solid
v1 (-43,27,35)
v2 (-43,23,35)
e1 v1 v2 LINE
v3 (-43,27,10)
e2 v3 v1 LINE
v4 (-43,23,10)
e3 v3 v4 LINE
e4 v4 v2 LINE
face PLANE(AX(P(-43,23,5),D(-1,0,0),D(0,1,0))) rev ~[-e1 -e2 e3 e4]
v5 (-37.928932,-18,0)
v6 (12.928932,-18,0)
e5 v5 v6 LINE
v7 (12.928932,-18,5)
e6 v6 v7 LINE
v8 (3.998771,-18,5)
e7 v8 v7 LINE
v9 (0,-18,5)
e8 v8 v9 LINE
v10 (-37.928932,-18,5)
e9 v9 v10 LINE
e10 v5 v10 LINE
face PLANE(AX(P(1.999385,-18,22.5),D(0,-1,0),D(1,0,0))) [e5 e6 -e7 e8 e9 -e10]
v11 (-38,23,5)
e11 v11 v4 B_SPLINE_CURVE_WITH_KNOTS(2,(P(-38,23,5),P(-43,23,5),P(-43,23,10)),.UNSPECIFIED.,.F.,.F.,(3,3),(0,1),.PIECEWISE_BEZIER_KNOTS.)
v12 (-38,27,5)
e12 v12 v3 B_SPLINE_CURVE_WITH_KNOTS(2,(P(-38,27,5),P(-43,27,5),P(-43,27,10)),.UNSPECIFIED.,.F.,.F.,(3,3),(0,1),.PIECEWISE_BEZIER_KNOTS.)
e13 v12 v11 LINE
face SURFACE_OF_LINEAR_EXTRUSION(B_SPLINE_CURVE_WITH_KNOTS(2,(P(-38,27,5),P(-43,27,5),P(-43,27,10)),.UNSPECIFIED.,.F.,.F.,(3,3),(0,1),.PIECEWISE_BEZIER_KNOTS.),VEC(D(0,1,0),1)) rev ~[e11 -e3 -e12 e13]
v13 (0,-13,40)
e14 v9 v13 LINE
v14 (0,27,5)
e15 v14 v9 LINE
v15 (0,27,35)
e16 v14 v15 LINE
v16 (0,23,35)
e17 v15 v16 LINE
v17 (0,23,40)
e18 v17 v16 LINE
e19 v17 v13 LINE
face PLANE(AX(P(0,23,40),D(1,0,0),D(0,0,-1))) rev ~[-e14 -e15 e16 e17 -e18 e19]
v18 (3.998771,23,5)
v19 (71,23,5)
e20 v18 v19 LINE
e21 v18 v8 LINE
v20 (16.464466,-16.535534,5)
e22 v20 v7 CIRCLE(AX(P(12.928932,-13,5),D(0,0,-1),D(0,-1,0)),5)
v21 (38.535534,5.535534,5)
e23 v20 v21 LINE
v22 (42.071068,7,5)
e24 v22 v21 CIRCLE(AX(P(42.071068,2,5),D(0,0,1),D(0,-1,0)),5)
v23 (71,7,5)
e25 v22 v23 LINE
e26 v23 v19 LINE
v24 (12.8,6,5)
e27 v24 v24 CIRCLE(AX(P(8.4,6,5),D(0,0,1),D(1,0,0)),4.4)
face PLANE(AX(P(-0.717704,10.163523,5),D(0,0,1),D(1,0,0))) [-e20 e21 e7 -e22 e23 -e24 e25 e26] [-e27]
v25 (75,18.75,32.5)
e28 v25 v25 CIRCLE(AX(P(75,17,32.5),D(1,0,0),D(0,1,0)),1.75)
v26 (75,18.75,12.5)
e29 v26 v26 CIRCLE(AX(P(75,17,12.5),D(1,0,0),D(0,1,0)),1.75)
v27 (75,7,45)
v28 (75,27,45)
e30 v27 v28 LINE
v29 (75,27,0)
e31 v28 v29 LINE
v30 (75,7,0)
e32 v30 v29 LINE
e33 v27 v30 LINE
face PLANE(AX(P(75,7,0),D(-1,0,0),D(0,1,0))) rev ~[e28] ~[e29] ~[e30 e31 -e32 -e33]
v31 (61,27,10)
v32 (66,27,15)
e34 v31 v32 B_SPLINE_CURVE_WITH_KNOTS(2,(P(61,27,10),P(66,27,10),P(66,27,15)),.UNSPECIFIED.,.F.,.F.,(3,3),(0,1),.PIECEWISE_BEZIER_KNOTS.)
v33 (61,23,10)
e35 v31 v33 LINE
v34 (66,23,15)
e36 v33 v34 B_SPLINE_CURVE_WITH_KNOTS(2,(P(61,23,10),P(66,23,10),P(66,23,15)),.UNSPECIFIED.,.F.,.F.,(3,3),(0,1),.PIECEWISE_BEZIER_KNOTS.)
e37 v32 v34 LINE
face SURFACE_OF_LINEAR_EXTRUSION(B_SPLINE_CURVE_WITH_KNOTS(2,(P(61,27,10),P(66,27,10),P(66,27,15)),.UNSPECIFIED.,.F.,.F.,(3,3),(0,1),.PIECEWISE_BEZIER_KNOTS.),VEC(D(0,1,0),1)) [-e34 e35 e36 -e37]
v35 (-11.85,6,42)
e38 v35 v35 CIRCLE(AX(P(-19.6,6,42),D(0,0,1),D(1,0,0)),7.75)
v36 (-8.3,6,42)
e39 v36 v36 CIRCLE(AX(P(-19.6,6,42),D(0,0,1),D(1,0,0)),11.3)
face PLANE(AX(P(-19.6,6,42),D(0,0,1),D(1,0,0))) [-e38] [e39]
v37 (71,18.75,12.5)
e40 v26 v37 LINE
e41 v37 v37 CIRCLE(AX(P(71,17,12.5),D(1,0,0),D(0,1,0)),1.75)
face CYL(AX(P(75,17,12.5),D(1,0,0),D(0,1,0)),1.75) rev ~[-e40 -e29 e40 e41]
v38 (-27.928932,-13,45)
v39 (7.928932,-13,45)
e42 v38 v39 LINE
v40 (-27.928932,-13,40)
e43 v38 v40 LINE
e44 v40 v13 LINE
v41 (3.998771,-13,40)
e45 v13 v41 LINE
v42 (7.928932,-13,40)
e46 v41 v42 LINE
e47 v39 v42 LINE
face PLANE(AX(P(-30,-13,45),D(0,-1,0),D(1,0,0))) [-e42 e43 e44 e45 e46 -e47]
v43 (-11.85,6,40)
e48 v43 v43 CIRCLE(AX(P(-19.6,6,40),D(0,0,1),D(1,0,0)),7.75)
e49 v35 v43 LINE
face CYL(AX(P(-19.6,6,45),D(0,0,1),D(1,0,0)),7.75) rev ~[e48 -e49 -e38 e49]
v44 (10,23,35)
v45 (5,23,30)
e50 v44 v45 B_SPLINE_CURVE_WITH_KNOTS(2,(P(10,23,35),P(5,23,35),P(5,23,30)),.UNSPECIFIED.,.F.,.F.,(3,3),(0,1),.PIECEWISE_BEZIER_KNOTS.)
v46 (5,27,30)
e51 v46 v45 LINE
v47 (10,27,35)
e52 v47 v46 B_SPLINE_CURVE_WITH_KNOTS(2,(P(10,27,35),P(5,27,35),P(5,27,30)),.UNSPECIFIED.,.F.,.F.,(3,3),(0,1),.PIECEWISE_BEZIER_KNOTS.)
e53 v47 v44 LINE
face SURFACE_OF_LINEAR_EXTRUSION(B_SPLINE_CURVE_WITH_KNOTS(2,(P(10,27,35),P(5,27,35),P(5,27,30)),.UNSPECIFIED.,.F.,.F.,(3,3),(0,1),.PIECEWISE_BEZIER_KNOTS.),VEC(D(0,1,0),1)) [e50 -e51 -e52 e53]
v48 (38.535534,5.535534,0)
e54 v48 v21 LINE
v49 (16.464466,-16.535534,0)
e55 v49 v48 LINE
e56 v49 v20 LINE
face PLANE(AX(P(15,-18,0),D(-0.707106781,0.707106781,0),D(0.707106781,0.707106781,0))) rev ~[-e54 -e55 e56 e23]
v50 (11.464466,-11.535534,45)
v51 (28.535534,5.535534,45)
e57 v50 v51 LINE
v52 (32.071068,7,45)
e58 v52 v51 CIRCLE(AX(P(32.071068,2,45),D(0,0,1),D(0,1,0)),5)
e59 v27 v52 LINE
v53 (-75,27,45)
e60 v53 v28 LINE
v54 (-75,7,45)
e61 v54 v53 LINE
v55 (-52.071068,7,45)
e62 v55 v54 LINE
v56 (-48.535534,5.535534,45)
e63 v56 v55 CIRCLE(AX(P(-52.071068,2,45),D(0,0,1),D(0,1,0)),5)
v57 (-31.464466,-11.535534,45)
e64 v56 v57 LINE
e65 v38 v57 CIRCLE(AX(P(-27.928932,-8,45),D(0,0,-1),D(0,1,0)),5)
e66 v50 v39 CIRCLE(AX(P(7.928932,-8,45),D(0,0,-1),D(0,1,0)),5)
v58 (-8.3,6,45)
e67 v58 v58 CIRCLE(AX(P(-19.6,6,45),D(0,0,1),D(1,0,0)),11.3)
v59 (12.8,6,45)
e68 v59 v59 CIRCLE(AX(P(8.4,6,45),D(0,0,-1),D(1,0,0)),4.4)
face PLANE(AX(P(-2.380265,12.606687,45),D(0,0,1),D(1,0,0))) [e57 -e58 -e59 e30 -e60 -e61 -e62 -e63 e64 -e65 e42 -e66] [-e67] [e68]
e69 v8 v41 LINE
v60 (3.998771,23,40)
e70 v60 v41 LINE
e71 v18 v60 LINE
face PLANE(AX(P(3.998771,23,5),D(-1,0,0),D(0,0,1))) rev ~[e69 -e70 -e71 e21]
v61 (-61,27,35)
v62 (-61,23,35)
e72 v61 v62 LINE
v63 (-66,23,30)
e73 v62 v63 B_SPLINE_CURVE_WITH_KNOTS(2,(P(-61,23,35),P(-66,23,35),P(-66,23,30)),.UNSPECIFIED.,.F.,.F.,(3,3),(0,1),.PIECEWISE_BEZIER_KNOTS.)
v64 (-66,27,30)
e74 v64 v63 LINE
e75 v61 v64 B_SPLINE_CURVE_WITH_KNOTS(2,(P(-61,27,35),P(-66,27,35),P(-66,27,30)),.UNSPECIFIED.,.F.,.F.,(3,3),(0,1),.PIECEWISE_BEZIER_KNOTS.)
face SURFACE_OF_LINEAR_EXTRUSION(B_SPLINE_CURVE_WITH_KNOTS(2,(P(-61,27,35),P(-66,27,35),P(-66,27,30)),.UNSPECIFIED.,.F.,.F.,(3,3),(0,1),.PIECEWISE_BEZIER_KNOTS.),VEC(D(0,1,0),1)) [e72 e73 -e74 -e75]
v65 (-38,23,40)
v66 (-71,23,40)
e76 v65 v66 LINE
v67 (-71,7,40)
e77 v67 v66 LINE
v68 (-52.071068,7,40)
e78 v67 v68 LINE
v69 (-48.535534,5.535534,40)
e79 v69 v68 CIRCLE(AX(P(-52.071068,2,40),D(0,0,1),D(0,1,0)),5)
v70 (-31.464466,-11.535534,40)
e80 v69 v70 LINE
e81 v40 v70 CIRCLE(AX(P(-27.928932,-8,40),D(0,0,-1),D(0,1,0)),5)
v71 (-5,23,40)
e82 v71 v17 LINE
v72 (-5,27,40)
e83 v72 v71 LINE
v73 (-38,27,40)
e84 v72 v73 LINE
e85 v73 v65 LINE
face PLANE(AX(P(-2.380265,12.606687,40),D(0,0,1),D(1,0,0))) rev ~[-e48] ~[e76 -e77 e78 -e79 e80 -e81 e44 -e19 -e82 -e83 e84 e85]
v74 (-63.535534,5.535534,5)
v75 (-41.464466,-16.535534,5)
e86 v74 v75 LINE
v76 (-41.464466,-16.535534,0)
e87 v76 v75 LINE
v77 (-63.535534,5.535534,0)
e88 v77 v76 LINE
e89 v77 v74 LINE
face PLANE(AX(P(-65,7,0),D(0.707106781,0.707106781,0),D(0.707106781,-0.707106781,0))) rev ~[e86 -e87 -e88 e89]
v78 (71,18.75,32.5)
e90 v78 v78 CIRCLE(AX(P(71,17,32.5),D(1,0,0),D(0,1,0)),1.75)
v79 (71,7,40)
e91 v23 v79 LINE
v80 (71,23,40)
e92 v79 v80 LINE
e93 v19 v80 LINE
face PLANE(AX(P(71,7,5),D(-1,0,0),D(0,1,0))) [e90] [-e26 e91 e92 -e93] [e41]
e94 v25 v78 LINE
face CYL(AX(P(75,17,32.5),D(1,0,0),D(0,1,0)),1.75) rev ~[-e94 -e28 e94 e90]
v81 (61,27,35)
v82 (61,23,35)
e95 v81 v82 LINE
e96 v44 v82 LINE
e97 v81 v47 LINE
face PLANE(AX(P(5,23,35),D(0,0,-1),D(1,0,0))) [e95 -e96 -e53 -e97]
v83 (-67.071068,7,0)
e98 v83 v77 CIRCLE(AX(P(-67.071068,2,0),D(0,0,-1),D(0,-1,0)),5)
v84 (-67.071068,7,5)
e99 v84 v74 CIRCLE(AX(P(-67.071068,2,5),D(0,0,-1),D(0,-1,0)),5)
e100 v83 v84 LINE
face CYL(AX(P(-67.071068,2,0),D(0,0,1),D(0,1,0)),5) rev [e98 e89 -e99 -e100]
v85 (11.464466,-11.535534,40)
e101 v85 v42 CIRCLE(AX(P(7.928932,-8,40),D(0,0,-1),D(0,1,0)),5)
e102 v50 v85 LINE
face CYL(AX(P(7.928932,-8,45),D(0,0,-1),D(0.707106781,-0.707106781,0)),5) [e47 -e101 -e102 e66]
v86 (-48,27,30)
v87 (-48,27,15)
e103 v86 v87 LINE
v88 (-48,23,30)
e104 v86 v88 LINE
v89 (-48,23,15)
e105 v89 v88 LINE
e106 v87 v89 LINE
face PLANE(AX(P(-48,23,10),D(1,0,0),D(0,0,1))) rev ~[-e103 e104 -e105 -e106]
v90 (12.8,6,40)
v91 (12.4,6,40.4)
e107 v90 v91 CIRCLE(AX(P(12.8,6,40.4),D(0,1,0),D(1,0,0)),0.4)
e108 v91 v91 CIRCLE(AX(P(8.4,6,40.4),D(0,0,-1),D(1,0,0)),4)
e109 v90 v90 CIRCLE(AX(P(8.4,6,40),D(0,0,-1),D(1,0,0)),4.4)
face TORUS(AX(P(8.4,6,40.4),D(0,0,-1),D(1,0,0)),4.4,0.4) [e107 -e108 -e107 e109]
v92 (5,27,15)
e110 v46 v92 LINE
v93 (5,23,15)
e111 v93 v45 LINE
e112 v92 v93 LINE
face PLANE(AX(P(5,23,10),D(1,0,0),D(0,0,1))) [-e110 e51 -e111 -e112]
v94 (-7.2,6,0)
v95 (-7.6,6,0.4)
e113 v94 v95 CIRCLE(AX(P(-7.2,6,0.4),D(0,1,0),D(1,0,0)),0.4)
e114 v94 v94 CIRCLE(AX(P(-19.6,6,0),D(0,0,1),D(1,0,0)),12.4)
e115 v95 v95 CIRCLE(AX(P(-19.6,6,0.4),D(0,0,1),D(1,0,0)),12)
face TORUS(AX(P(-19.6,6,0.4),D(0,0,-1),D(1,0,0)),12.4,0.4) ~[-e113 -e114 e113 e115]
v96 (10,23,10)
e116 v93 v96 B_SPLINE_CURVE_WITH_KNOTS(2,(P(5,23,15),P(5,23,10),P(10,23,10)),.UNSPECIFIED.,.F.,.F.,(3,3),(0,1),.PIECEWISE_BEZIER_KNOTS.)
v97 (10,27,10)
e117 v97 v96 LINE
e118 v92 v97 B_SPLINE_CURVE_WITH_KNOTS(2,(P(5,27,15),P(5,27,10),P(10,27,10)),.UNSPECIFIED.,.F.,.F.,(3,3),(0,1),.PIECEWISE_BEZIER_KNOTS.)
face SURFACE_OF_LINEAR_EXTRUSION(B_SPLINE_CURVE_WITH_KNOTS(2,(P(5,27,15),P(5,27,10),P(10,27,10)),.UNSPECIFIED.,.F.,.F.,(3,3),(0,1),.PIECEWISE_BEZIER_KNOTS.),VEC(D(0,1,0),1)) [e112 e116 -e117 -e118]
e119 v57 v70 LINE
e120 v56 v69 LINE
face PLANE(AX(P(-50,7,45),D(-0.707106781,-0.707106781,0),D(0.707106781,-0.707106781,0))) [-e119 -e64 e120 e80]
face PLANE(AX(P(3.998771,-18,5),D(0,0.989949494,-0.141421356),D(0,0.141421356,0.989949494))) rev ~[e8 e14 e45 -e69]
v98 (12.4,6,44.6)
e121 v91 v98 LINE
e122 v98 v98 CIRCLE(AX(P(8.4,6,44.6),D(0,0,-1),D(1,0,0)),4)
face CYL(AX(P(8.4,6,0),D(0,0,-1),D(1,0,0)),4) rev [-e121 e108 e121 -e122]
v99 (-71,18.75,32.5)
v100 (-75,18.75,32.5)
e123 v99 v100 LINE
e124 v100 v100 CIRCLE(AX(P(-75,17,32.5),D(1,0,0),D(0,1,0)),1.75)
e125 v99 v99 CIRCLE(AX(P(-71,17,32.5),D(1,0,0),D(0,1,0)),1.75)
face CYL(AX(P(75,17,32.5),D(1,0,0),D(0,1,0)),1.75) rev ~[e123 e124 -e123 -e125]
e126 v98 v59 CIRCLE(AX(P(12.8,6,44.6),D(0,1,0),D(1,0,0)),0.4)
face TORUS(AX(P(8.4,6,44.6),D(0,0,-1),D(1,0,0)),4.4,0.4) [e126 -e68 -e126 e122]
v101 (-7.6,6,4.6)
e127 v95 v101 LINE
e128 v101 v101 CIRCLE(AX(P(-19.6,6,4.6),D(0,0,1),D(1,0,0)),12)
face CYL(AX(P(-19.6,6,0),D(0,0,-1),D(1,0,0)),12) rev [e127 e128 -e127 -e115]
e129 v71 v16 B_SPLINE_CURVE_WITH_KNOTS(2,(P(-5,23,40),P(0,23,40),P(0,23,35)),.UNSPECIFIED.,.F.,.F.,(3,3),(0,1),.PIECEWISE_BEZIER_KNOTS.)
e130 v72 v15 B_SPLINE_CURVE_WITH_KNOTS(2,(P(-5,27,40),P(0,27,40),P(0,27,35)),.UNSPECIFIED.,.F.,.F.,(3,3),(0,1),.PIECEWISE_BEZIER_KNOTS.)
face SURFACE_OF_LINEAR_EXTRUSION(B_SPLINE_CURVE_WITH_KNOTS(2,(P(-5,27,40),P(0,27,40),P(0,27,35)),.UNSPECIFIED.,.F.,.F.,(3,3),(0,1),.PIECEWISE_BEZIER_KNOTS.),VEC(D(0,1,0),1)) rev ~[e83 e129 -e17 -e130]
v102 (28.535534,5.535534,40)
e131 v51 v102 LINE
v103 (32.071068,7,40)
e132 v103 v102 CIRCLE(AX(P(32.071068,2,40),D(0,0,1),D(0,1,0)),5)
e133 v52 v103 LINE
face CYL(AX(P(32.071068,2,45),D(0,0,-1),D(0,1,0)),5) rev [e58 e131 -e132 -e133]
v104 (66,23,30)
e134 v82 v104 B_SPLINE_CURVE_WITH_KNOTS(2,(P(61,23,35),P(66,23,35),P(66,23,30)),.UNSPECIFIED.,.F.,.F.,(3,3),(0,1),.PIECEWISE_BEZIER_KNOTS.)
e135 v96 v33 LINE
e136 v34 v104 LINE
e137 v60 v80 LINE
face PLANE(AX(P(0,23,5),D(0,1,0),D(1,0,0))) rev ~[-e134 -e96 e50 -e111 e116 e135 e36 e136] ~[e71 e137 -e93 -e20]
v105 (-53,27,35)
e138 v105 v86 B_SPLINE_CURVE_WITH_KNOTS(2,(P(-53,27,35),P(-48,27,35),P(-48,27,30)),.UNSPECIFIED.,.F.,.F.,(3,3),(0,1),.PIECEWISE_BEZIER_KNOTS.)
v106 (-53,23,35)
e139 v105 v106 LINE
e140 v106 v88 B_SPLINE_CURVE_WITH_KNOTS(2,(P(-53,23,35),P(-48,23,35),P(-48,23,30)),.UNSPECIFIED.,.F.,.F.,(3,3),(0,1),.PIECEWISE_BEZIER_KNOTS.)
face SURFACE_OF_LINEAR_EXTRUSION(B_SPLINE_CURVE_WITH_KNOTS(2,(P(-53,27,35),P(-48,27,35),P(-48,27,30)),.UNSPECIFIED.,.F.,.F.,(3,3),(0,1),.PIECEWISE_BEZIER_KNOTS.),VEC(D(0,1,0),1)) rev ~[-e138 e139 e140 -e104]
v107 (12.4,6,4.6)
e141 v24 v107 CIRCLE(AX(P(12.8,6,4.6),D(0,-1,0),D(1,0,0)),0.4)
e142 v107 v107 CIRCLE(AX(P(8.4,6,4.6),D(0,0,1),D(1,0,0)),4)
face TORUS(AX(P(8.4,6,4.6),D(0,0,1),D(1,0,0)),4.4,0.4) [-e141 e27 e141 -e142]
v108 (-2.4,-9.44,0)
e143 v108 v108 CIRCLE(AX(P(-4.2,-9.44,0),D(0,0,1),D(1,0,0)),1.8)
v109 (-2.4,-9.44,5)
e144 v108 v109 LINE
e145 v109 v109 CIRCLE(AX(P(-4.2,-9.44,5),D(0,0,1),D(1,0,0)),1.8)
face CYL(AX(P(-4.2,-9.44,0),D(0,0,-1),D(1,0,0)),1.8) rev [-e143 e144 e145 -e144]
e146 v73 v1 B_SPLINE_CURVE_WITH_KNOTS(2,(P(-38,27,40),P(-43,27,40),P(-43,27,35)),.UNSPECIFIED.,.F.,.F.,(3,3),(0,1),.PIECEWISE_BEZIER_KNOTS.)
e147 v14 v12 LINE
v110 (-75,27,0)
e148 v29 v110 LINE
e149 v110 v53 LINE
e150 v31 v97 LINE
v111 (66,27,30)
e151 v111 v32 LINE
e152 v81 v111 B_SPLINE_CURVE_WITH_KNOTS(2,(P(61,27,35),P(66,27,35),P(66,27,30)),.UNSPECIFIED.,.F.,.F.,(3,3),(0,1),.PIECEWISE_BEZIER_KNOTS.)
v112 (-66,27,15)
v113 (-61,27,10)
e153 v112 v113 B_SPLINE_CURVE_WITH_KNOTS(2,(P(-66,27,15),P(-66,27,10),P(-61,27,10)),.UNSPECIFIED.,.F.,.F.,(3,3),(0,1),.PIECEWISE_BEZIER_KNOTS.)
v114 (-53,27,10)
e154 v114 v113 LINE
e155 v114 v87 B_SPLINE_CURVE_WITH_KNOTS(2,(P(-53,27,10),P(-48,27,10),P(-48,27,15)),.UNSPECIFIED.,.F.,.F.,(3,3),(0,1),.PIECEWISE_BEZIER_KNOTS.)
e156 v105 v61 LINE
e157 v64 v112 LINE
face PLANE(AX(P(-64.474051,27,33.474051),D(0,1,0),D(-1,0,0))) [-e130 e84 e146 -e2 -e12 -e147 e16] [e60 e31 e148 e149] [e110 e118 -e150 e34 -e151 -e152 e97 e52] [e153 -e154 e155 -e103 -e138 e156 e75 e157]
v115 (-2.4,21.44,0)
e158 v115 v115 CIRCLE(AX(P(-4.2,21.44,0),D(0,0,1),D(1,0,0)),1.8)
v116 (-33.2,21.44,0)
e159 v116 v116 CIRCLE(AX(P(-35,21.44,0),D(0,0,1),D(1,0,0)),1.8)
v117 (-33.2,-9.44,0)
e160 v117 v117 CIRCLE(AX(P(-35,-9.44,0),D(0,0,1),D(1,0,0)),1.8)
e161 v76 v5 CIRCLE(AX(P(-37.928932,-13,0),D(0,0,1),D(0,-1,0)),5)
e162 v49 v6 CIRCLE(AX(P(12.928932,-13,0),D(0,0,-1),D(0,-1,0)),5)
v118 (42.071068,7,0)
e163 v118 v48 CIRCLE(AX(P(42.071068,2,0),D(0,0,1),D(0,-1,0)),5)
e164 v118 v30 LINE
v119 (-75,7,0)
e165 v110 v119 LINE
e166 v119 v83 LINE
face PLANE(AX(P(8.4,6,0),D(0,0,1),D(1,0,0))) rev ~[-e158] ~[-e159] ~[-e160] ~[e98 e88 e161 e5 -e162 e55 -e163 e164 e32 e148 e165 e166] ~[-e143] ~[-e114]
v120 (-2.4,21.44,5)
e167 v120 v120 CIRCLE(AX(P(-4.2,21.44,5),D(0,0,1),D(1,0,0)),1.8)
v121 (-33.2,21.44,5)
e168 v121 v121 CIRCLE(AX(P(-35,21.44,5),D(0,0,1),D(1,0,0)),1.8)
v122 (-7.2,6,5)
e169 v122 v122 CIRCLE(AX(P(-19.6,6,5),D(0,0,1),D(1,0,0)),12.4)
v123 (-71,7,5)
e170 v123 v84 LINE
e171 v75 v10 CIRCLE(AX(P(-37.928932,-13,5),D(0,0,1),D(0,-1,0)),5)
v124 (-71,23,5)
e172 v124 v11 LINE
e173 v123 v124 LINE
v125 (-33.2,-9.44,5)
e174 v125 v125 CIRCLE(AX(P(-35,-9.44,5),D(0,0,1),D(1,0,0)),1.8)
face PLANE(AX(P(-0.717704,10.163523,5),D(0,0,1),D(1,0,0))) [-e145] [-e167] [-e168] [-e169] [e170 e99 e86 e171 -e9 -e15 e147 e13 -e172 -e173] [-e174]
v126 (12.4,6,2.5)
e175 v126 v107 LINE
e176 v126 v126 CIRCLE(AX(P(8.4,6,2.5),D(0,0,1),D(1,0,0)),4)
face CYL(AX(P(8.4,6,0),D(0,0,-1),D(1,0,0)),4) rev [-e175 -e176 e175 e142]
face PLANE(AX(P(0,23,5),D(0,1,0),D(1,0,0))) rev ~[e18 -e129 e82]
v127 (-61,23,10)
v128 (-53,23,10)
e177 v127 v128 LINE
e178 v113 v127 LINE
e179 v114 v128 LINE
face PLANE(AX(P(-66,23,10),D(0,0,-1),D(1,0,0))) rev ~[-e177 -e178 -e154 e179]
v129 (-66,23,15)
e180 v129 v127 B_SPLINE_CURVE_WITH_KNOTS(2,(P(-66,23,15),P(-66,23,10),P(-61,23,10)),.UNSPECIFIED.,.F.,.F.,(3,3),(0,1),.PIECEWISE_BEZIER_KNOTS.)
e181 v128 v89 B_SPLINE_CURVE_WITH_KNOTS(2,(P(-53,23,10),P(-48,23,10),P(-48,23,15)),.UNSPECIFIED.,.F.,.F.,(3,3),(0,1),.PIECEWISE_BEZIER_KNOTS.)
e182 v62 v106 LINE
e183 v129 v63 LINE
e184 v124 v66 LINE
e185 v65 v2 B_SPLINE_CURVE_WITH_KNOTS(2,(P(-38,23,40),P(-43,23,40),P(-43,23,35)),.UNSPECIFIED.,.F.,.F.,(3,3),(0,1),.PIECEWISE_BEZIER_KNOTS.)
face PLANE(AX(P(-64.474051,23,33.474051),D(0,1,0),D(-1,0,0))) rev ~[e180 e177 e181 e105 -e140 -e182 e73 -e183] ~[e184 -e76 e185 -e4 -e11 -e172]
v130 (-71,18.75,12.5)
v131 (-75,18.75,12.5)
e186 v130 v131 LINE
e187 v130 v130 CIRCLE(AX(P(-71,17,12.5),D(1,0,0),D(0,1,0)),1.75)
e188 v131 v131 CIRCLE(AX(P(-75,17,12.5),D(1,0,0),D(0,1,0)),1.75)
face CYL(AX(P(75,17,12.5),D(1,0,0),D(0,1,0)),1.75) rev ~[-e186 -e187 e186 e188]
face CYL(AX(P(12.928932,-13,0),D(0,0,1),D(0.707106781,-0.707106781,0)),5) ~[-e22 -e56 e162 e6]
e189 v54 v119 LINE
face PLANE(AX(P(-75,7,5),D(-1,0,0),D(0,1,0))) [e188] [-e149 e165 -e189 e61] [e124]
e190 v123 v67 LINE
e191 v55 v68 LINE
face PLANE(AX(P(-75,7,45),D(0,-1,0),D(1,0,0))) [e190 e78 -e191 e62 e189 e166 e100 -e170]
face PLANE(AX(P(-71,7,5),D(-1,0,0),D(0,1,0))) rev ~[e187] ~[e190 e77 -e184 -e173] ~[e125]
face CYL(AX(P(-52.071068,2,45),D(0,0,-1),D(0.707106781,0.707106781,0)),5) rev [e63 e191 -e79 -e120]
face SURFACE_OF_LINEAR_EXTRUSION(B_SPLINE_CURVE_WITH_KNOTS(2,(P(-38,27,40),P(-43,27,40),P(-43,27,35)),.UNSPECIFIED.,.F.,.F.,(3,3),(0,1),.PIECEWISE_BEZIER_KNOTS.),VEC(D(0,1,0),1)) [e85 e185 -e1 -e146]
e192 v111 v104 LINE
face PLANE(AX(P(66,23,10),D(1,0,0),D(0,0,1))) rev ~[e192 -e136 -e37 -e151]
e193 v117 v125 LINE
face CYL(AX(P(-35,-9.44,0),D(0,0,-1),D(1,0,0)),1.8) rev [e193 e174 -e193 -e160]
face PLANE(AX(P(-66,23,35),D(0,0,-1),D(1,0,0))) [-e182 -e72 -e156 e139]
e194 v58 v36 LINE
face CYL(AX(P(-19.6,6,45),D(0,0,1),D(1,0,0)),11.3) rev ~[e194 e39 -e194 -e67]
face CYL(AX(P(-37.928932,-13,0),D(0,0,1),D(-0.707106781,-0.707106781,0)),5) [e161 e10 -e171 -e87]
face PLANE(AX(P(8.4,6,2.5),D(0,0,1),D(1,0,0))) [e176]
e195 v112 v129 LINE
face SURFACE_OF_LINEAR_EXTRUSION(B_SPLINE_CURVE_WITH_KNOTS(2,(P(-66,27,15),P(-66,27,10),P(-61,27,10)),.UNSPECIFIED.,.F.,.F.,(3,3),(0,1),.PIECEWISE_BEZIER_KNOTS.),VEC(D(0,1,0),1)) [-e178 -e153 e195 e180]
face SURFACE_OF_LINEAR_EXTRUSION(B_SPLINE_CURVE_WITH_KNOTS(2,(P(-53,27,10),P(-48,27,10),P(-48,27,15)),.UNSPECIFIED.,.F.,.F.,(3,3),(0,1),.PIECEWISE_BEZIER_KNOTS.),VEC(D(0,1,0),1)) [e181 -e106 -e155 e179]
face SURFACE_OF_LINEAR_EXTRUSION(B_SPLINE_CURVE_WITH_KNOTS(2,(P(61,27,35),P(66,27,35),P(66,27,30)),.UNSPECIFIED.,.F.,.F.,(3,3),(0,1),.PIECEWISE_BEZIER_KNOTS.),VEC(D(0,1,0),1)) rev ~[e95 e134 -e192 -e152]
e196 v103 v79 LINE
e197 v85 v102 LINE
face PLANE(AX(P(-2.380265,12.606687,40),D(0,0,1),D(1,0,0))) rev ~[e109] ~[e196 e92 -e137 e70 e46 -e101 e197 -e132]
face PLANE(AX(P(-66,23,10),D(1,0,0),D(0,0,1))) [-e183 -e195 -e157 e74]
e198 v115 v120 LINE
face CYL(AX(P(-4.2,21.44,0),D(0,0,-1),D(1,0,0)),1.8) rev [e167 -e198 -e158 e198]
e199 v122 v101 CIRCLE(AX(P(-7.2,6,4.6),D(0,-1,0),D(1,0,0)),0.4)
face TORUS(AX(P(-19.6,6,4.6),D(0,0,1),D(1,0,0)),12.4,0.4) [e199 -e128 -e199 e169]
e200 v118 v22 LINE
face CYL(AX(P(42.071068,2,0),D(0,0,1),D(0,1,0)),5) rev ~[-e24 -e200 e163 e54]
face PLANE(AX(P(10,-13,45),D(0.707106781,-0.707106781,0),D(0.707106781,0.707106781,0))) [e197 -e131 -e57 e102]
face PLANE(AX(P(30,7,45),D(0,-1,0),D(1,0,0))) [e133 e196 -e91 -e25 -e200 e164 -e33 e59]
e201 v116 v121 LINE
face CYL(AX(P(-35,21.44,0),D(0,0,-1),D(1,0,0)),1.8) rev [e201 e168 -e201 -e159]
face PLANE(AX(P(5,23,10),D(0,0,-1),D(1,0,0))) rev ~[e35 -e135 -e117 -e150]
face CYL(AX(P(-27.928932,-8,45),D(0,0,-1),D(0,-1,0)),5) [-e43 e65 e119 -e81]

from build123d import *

# Parameters (mm, degrees)
F0_R         = 1.8
F0_R_2       = 12
F0_R_3       = 4
F1_DEPTH     = 5
F2_W         = 4
F2_H         = 20
F3_DEPTH     = 40
F4_R         = 12.5
F4_R_2       = 11.3
F4_R_3       = 7.75
F5_DEPTH     = 5
F6_DEPTH     = 50
F7_DEPTH     = 3
F8_R         = 5
F9_R         = 0.4
F10_DEPTH    = 2.5
F11_R        = 1.75
F12_DEPTH    = 150.001
F13_W        = 28
F13_H        = 4
F13_W_2      = 71
F14_DEPTH    = 40
F15_W        = 18
F15_H        = 25
F15_W_2      = 61
F16_DEPTH    = 25
F17_T1_DEPTH = 4
F19_DEPTH    = 41
F21_DEPTH    = 5


# Not quite as in the source:
# - a fillet or chamfer that OpenCascade refuses, or shapes differently, is made with other operations: its cross-section is extruded or revolved along the edge and cut away or added


with BuildPart() as f1:
    # F0 (on Top) → F1 (new body)
    with BuildSketch(Plane.XY):
        Polygon((75, 27), (-75, 27), (-75, 7), (-65, 7), (-40, -18), (15, -18), (40, 7), (75, 7), align=None)
        with Locations((-35, -9.44)):
            Circle(F0_R, mode=Mode.SUBTRACT)
        with Locations((-4.2, -9.44)):
            Circle(F0_R, mode=Mode.SUBTRACT)
        with Locations((-19.6, 6)):
            Circle(F0_R_2, mode=Mode.SUBTRACT)
        with Locations((-35, 21.44)):
            Circle(F0_R, mode=Mode.SUBTRACT)
        with Locations((-4.2, 21.44)):
            Circle(F0_R, mode=Mode.SUBTRACT)
        with Locations((8.4, 6)):
            Circle(F0_R_3, mode=Mode.SUBTRACT)
    extrude(amount=F1_DEPTH)

    # F2 (on face) → F3 (join)
    with BuildSketch(Plane.XY.offset(5)):
        with Locations((-73, 17)):
            Rectangle(F2_W, F2_H)
        with Locations((73, 17)):
            Rectangle(F2_W, F2_H)
    extrude(amount=F3_DEPTH)

    # F4 (on face) → F5 (join)
    with BuildSketch(Plane.XY.offset(45)):
        Polygon((71, 7), (71, 27), (-75, 27), (-75, 7), (-50, 7), (-30, -13), (10, -13), (30, 7), align=None)
        with Locations((-19.6, 6)):
            Circle(F4_R, mode=Mode.SUBTRACT)
        with Locations((-19.6, 6)):
            Circle(F4_R)
        with Locations((-19.6, 6)):
            Circle(F4_R_2, mode=Mode.SUBTRACT)
        with Locations((-19.6, 6)):
            Circle(F4_R_2)
        with Locations((-19.6, 6)):
            Circle(F4_R_3, mode=Mode.SUBTRACT)
    extrude(amount=-F5_DEPTH)

    # F0 (on Top) → F6 (cut)
    with BuildSketch(Plane.XY):
        with Locations((8.4, 6)):
            Circle(F0_R_3)
    extrude(amount=F6_DEPTH, mode=Mode.SUBTRACT)

    # F4 (on face) → F7 (cut)
    with BuildSketch(Plane.XY.offset(45)):
        with Locations((-19.6, 6)):
            Circle(F4_R_2)
        with Locations((-19.6, 6)):
            Circle(F4_R_3, mode=Mode.SUBTRACT)
    extrude(amount=-F7_DEPTH, mode=Mode.SUBTRACT)

    # F8
    f8_edges = [f1.edges().sort_by_distance(p)[0] for p in [
        (-65, 7, 2.5),
        (-40, -18, 2.5),
        (40, 7, 2.5),
        (15, -18, 2.5),
        (-50, 7, 42.5),
        (-30, -13, 42.5),
        (10, -13, 42.5),
        (30, 7, 42.5),
    ]]
    fillet(f8_edges, radius=F8_R)

    # F9
    f9_edges = [f1.edges().sort_by_distance(p)[0] for p in [
        (-31.6, 6, 5),
        (-31.6, 6, 0),
        (4.4, 6, 5),
        (4.4, 6, 45),
        (4.4, 6, 40),
    ]]
    fillet(f9_edges, radius=F9_R)

    # F0 (on Top) → F10 (join)
    with BuildSketch(Plane.XY):
        with Locations((8.4, 6)):
            Circle(F0_R_3)
    extrude(amount=F10_DEPTH)

    # F11 (on face) → F12 (cut, through all)
    with BuildSketch(Plane.YZ.offset(75)):
        with Locations((17, 32.5)):
            Circle(F11_R)
        with Locations((17, 12.5)):
            Circle(F11_R)
    extrude(amount=-F12_DEPTH, mode=Mode.SUBTRACT)

    # F13 (on face) → F14 (join)
    with BuildSketch(Plane.XY.offset(5)):
        with Locations((-57, 25)):
            Rectangle(F13_W, F13_H)
        with Locations((35.5, 25)):
            Rectangle(F13_W_2, F13_H)
    extrude(amount=F14_DEPTH)

    # F15 (on face) → F16 (cut)
    with BuildSketch(Plane.XZ.offset(-23)):
        with Locations((-57, 22.5)):
            Rectangle(F15_W, F15_H)
        with Locations((35.5, 22.5)):
            Rectangle(F15_W_2, F15_H)
    extrude(amount=-F16_DEPTH, mode=Mode.SUBTRACT)

    # F17: fillet of radius 5 on 11 edges, made by hand

    # F17_s2 → F17_t1 (join)
    with BuildSketch(Plane.XZ.offset(-27)):
        with BuildLine():
            add(Edge.make_bspline(
                [(-61, 35), (-66, 35), (-66, 30)],
                knots=[0, 0, 0, 1, 1, 1], degree=2, weights=[1, 1, 1]))
            Line((-66, 30), (-66, 35))
            Line((-66, 35), (-61, 35))
        make_face()
        with BuildLine():
            add(Edge.make_bspline(
                [(10, 35), (5, 35), (5, 30)],
                knots=[0, 0, 0, 1, 1, 1], degree=2, weights=[1, 1, 1]))
            Line((5, 30), (5, 35))
            Line((5, 35), (10, 35))
        make_face()
        with BuildLine():
            add(Edge.make_bspline(
                [(-53, 10), (-48, 10), (-48, 15)],
                knots=[0, 0, 0, 1, 1, 1], degree=2, weights=[1, 1, 1]))
            Line((-48, 15), (-48, 10))
            Line((-48, 10), (-53, 10))
        make_face()
        with BuildLine():
            add(Edge.make_bspline(
                [(61, 10), (66, 10), (66, 15)],
                knots=[0, 0, 0, 1, 1, 1], degree=2, weights=[1, 1, 1]))
            Line((66, 15), (66, 10))
            Line((66, 10), (61, 10))
        make_face()
        with BuildLine():
            add(Edge.make_bspline(
                [(61, 35), (66, 35), (66, 30)],
                knots=[0, 0, 0, 1, 1, 1], degree=2, weights=[1, 1, 1]))
            Line((66, 30), (66, 35))
            Line((66, 35), (61, 35))
        make_face()
        with BuildLine():
            add(Edge.make_bspline(
                [(-5, 40), (0, 40), (0, 35)],
                knots=[0, 0, 0, 1, 1, 1], degree=2, weights=[1, 1, 1]))
            Line((0, 35), (0, 40))
            Line((0, 40), (-5, 40))
        make_face()
        with BuildLine():
            add(Edge.make_bspline(
                [(-53, 35), (-48, 35), (-48, 30)],
                knots=[0, 0, 0, 1, 1, 1], degree=2, weights=[1, 1, 1]))
            Line((-48, 30), (-48, 35))
            Line((-48, 35), (-53, 35))
        make_face()
        with BuildLine():
            add(Edge.make_bspline(
                [(-38, 5), (-43, 5), (-43, 10)],
                knots=[0, 0, 0, 1, 1, 1], degree=2, weights=[1, 1, 1]))
            Line((-43, 10), (-43, 5))
            Line((-43, 5), (-38, 5))
        make_face()
        with BuildLine():
            add(Edge.make_bspline(
                [(-66, 15), (-66, 10), (-61, 10)],
                knots=[0, 0, 0, 1, 1, 1], degree=2, weights=[1, 1, 1]))
            Line((-61, 10), (-66, 10))
            Line((-66, 10), (-66, 15))
        make_face()
        with BuildLine():
            add(Edge.make_bspline(
                [(5, 15), (5, 10), (10, 10)],
                knots=[0, 0, 0, 1, 1, 1], degree=2, weights=[1, 1, 1]))
            Line((10, 10), (5, 10))
            Line((5, 10), (5, 15))
        make_face()
        with BuildLine():
            add(Edge.make_bspline(
                [(-38, 40), (-43, 40), (-43, 35)],
                knots=[0, 0, 0, 1, 1, 1], degree=2, weights=[1, 1, 1]))
            Line((-43, 35), (-43, 40))
            Line((-43, 40), (-38, 40))
        make_face()
    extrude(amount=F17_T1_DEPTH)

    # F18 (on face) → F19 (join)
    with BuildSketch(Plane.XZ.offset(-23)):
        Polygon((0, 35), (0, 5), (3.9987709172, 5), (3.9987709172, 40), (0, 40), align=None)
    extrude(amount=F19_DEPTH)

    # F20 (on face) → F21 (cut)
    with BuildSketch(Plane.YZ.offset(3.9987709172)):
        Polygon((-18, 5), (-13, 40), (-18, 40), align=None)
    extrude(amount=-F21_DEPTH, mode=Mode.SUBTRACT)


solid = f1.part
